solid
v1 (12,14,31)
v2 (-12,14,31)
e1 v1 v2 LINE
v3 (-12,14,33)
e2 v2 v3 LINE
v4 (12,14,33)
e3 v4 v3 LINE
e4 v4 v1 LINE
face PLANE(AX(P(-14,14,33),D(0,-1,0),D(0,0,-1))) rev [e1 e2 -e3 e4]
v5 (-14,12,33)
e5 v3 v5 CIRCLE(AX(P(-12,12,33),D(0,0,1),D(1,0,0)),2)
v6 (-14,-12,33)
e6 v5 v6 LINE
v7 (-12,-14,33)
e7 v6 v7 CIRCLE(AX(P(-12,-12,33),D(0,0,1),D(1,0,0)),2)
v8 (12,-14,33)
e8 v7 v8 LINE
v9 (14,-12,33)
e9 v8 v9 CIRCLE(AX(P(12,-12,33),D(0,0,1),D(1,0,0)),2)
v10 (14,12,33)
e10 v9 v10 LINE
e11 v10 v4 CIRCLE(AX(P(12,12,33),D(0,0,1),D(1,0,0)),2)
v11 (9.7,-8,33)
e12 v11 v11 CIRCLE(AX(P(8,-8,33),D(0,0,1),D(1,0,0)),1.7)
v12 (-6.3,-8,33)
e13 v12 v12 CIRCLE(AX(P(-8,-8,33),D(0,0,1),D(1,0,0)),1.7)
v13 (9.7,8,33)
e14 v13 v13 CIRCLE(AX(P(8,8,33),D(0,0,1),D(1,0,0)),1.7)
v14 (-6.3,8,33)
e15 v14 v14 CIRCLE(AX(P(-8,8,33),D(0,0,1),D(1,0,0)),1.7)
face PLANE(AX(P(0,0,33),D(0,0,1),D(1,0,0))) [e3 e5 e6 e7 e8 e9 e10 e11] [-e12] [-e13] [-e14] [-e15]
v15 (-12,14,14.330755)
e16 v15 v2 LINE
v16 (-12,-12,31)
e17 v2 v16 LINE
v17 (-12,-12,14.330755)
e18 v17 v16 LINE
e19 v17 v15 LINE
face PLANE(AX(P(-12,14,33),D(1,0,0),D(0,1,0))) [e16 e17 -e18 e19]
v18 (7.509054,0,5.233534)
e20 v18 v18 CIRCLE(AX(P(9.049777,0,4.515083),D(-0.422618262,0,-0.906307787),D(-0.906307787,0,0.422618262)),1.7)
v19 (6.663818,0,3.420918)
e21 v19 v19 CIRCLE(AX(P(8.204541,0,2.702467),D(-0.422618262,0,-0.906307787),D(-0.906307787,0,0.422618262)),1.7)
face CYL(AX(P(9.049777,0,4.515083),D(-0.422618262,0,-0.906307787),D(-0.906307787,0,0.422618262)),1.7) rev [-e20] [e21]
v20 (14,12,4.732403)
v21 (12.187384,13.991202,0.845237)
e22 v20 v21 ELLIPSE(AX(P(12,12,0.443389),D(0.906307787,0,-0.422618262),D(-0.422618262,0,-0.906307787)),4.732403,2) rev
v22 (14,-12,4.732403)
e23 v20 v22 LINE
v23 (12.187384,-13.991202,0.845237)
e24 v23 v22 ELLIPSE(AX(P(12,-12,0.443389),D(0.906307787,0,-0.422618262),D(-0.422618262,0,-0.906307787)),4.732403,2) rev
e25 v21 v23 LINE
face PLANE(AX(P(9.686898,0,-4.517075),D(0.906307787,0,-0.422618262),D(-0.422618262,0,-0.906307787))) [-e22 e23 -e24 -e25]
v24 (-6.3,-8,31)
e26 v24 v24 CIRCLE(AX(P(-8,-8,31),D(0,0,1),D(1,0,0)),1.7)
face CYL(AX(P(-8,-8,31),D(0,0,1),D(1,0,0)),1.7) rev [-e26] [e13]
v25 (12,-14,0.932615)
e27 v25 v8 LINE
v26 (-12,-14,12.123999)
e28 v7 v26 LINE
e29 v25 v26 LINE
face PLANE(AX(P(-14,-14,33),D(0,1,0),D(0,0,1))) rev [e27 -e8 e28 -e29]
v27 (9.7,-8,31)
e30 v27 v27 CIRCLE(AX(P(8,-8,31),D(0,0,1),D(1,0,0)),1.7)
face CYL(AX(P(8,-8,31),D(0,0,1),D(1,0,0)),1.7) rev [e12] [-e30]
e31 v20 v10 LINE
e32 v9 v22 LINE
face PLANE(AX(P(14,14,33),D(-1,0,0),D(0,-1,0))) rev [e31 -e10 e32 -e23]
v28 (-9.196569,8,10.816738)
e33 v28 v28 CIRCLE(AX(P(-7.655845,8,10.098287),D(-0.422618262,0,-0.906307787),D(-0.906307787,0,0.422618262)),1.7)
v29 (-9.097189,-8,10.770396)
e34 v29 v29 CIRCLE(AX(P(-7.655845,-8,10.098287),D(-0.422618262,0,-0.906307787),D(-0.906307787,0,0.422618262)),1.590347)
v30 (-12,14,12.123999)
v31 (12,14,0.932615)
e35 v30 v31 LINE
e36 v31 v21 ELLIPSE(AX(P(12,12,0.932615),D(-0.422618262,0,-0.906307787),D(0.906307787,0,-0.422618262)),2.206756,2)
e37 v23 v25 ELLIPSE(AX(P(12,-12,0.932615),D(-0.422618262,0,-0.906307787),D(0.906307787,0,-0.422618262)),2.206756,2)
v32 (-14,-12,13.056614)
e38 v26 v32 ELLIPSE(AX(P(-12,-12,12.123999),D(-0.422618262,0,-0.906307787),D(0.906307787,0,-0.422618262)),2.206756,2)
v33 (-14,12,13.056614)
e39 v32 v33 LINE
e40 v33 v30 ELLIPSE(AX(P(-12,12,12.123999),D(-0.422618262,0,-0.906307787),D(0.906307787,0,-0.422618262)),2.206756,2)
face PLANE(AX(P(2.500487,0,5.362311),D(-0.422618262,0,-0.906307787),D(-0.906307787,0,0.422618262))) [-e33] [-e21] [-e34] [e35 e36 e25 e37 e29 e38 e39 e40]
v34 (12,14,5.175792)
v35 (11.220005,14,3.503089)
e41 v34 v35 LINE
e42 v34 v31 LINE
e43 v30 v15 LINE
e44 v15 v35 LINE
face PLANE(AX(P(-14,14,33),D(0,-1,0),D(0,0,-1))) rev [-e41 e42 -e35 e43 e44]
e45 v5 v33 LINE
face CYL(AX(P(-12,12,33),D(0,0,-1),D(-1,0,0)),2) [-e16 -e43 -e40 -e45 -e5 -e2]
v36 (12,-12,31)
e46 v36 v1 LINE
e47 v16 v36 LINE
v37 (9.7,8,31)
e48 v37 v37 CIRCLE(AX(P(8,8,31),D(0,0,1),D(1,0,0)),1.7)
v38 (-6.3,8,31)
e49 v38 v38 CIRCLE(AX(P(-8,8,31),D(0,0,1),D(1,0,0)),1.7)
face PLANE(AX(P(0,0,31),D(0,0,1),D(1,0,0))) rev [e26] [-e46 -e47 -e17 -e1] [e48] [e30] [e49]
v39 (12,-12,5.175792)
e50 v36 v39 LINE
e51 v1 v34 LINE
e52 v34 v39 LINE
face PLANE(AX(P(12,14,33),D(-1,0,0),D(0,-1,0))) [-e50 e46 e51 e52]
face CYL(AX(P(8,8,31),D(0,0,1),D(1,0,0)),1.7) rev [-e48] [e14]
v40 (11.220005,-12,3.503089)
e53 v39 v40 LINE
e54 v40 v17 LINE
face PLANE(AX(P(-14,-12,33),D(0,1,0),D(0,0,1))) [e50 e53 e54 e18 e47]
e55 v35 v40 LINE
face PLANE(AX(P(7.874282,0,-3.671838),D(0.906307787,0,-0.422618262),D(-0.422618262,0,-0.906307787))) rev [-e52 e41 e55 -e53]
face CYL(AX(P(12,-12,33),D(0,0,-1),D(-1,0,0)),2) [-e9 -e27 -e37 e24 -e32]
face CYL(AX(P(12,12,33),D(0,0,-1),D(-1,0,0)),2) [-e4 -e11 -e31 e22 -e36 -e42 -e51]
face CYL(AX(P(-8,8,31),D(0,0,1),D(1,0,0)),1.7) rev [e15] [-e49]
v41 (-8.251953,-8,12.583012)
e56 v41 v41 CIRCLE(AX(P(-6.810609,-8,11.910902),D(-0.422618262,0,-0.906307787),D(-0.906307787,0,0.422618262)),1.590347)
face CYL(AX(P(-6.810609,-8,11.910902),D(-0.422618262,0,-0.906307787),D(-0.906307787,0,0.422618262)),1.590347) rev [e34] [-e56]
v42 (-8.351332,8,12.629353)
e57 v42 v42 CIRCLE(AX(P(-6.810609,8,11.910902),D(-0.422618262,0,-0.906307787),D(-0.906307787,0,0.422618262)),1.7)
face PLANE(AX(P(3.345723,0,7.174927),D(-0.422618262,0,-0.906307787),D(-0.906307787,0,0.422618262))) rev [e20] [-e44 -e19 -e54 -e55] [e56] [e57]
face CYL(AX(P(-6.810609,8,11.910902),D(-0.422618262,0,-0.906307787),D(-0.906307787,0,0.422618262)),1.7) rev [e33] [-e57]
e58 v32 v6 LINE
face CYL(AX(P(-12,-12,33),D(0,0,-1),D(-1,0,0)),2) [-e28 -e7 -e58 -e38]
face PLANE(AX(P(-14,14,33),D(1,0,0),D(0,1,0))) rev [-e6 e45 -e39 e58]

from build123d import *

# Parameters (mm, degrees)
SKETCH1_W           = 28
SKETCH1_H           = 28
BOSS_EXTRUDE1_DEPTH = 33
SKETCH3_W           = 49.200789626
SKETCH3_H           = 42.103599699
CUT_EXTRUDE1_DEPTH  = 15
FILLET1_R           = 2
SKETCH7_W           = 35.932527634
SKETCH7_H           = 14.196879105
CUT_EXTRUDE3_DEPTH  = 2
SHELL1_START        = -12
SHELL1_DEPTH        = 26
SKETCH8_R           = 1.7
CUT_EXTRUDE4_DEPTH  = 2
SKETCH9_R           = 1.590347025
SKETCH9_R_2         = 1.7
CUT_EXTRUDE5_DEPTH  = 2


# Read off the part's stored shape, not the designer's step: Shell1
with BuildPart() as part:
    # Sketch1 → Boss-Extrude1 (new body)
    with BuildSketch(Plane.XY):
        Rectangle(SKETCH1_W, SKETCH1_H)
    extrude(amount=BOSS_EXTRUDE1_DEPTH)

    # Sketch3 → Cut-Extrude1 (cut)
    with BuildSketch(Plane(origin=(2.500486732, 0, 5.362311102), x_dir=(0, 1, 0), z_dir=(0.4226182617407003, 0, 0.9063077870366496))):
        with Locations((-1.181385954, 1.948035585)):
            Rectangle(SKETCH3_W, SKETCH3_H)
    extrude(amount=-CUT_EXTRUDE1_DEPTH, mode=Mode.SUBTRACT)

    # Fillet1
    fillet1_edges = [part.edges().sort_by_distance(p)[0] for p in [
        (14, -14, 16.5),
        (-14, -14, 23.028307214),
        (-14, 14, 23.028307214),
        (14, 14, 16.5),
    ]]
    fillet(fillet1_edges, radius=FILLET1_R)

    # Sketch7 → Cut-Extrude3 (cut)
    with BuildSketch(Plane(origin=(11.499513268, 0, -5.362311102), x_dir=(0, 1, 0), z_dir=(0.9063077870366496, 0, -0.4226182617407003))):
        with Locations((0.607628843, 7.098439553)):
            Rectangle(SKETCH7_W, SKETCH7_H)
    extrude(amount=-CUT_EXTRUDE3_DEPTH, mode=Mode.SUBTRACT)

    # Shell1 outline → Shell1 (cut)
    with BuildSketch(Plane(origin=(0, 0, 0), x_dir=(1, 0, 0), z_dir=(0, 1, 0)).offset(SHELL1_START)):
        Polygon((12, -31), (12, -5.175792492), (11.220005375, -3.503088621), (-12, -14.33075495), (-12, -31), align=None)
    extrude(amount=SHELL1_DEPTH, mode=Mode.SUBTRACT)

    # Sketch8 → Cut-Extrude4 (cut)
    with BuildSketch(Plane.XY.offset(33)):
        with Locations((-8, 8)):
            Circle(SKETCH8_R)
        with Locations((8, 8)):
            Circle(SKETCH8_R)
        with Locations((8, -8)):
            Circle(SKETCH8_R)
        with Locations((-8, -8)):
            Circle(SKETCH8_R)
    extrude(amount=-CUT_EXTRUDE4_DEPTH, mode=Mode.SUBTRACT)

    # Sketch9 → Cut-Extrude5 (cut)
    with BuildSketch(Plane(origin=(2.500486732, 0, 5.362311102), x_dir=(-0.9063077870366496, 0, 0.4226182617407002), z_dir=(-0.4226182617407003, 0, -0.9063077870366497))):
        with Locations((11.206272712, -8)):
            Circle(SKETCH9_R)
        with Locations((11.206272712, 8)):
            Circle(SKETCH9_R_2)
        with Locations((-6.293727288, 0)):
            Circle(SKETCH9_R_2)
    extrude(amount=-CUT_EXTRUDE5_DEPTH, mode=Mode.SUBTRACT)


solid = part.part
